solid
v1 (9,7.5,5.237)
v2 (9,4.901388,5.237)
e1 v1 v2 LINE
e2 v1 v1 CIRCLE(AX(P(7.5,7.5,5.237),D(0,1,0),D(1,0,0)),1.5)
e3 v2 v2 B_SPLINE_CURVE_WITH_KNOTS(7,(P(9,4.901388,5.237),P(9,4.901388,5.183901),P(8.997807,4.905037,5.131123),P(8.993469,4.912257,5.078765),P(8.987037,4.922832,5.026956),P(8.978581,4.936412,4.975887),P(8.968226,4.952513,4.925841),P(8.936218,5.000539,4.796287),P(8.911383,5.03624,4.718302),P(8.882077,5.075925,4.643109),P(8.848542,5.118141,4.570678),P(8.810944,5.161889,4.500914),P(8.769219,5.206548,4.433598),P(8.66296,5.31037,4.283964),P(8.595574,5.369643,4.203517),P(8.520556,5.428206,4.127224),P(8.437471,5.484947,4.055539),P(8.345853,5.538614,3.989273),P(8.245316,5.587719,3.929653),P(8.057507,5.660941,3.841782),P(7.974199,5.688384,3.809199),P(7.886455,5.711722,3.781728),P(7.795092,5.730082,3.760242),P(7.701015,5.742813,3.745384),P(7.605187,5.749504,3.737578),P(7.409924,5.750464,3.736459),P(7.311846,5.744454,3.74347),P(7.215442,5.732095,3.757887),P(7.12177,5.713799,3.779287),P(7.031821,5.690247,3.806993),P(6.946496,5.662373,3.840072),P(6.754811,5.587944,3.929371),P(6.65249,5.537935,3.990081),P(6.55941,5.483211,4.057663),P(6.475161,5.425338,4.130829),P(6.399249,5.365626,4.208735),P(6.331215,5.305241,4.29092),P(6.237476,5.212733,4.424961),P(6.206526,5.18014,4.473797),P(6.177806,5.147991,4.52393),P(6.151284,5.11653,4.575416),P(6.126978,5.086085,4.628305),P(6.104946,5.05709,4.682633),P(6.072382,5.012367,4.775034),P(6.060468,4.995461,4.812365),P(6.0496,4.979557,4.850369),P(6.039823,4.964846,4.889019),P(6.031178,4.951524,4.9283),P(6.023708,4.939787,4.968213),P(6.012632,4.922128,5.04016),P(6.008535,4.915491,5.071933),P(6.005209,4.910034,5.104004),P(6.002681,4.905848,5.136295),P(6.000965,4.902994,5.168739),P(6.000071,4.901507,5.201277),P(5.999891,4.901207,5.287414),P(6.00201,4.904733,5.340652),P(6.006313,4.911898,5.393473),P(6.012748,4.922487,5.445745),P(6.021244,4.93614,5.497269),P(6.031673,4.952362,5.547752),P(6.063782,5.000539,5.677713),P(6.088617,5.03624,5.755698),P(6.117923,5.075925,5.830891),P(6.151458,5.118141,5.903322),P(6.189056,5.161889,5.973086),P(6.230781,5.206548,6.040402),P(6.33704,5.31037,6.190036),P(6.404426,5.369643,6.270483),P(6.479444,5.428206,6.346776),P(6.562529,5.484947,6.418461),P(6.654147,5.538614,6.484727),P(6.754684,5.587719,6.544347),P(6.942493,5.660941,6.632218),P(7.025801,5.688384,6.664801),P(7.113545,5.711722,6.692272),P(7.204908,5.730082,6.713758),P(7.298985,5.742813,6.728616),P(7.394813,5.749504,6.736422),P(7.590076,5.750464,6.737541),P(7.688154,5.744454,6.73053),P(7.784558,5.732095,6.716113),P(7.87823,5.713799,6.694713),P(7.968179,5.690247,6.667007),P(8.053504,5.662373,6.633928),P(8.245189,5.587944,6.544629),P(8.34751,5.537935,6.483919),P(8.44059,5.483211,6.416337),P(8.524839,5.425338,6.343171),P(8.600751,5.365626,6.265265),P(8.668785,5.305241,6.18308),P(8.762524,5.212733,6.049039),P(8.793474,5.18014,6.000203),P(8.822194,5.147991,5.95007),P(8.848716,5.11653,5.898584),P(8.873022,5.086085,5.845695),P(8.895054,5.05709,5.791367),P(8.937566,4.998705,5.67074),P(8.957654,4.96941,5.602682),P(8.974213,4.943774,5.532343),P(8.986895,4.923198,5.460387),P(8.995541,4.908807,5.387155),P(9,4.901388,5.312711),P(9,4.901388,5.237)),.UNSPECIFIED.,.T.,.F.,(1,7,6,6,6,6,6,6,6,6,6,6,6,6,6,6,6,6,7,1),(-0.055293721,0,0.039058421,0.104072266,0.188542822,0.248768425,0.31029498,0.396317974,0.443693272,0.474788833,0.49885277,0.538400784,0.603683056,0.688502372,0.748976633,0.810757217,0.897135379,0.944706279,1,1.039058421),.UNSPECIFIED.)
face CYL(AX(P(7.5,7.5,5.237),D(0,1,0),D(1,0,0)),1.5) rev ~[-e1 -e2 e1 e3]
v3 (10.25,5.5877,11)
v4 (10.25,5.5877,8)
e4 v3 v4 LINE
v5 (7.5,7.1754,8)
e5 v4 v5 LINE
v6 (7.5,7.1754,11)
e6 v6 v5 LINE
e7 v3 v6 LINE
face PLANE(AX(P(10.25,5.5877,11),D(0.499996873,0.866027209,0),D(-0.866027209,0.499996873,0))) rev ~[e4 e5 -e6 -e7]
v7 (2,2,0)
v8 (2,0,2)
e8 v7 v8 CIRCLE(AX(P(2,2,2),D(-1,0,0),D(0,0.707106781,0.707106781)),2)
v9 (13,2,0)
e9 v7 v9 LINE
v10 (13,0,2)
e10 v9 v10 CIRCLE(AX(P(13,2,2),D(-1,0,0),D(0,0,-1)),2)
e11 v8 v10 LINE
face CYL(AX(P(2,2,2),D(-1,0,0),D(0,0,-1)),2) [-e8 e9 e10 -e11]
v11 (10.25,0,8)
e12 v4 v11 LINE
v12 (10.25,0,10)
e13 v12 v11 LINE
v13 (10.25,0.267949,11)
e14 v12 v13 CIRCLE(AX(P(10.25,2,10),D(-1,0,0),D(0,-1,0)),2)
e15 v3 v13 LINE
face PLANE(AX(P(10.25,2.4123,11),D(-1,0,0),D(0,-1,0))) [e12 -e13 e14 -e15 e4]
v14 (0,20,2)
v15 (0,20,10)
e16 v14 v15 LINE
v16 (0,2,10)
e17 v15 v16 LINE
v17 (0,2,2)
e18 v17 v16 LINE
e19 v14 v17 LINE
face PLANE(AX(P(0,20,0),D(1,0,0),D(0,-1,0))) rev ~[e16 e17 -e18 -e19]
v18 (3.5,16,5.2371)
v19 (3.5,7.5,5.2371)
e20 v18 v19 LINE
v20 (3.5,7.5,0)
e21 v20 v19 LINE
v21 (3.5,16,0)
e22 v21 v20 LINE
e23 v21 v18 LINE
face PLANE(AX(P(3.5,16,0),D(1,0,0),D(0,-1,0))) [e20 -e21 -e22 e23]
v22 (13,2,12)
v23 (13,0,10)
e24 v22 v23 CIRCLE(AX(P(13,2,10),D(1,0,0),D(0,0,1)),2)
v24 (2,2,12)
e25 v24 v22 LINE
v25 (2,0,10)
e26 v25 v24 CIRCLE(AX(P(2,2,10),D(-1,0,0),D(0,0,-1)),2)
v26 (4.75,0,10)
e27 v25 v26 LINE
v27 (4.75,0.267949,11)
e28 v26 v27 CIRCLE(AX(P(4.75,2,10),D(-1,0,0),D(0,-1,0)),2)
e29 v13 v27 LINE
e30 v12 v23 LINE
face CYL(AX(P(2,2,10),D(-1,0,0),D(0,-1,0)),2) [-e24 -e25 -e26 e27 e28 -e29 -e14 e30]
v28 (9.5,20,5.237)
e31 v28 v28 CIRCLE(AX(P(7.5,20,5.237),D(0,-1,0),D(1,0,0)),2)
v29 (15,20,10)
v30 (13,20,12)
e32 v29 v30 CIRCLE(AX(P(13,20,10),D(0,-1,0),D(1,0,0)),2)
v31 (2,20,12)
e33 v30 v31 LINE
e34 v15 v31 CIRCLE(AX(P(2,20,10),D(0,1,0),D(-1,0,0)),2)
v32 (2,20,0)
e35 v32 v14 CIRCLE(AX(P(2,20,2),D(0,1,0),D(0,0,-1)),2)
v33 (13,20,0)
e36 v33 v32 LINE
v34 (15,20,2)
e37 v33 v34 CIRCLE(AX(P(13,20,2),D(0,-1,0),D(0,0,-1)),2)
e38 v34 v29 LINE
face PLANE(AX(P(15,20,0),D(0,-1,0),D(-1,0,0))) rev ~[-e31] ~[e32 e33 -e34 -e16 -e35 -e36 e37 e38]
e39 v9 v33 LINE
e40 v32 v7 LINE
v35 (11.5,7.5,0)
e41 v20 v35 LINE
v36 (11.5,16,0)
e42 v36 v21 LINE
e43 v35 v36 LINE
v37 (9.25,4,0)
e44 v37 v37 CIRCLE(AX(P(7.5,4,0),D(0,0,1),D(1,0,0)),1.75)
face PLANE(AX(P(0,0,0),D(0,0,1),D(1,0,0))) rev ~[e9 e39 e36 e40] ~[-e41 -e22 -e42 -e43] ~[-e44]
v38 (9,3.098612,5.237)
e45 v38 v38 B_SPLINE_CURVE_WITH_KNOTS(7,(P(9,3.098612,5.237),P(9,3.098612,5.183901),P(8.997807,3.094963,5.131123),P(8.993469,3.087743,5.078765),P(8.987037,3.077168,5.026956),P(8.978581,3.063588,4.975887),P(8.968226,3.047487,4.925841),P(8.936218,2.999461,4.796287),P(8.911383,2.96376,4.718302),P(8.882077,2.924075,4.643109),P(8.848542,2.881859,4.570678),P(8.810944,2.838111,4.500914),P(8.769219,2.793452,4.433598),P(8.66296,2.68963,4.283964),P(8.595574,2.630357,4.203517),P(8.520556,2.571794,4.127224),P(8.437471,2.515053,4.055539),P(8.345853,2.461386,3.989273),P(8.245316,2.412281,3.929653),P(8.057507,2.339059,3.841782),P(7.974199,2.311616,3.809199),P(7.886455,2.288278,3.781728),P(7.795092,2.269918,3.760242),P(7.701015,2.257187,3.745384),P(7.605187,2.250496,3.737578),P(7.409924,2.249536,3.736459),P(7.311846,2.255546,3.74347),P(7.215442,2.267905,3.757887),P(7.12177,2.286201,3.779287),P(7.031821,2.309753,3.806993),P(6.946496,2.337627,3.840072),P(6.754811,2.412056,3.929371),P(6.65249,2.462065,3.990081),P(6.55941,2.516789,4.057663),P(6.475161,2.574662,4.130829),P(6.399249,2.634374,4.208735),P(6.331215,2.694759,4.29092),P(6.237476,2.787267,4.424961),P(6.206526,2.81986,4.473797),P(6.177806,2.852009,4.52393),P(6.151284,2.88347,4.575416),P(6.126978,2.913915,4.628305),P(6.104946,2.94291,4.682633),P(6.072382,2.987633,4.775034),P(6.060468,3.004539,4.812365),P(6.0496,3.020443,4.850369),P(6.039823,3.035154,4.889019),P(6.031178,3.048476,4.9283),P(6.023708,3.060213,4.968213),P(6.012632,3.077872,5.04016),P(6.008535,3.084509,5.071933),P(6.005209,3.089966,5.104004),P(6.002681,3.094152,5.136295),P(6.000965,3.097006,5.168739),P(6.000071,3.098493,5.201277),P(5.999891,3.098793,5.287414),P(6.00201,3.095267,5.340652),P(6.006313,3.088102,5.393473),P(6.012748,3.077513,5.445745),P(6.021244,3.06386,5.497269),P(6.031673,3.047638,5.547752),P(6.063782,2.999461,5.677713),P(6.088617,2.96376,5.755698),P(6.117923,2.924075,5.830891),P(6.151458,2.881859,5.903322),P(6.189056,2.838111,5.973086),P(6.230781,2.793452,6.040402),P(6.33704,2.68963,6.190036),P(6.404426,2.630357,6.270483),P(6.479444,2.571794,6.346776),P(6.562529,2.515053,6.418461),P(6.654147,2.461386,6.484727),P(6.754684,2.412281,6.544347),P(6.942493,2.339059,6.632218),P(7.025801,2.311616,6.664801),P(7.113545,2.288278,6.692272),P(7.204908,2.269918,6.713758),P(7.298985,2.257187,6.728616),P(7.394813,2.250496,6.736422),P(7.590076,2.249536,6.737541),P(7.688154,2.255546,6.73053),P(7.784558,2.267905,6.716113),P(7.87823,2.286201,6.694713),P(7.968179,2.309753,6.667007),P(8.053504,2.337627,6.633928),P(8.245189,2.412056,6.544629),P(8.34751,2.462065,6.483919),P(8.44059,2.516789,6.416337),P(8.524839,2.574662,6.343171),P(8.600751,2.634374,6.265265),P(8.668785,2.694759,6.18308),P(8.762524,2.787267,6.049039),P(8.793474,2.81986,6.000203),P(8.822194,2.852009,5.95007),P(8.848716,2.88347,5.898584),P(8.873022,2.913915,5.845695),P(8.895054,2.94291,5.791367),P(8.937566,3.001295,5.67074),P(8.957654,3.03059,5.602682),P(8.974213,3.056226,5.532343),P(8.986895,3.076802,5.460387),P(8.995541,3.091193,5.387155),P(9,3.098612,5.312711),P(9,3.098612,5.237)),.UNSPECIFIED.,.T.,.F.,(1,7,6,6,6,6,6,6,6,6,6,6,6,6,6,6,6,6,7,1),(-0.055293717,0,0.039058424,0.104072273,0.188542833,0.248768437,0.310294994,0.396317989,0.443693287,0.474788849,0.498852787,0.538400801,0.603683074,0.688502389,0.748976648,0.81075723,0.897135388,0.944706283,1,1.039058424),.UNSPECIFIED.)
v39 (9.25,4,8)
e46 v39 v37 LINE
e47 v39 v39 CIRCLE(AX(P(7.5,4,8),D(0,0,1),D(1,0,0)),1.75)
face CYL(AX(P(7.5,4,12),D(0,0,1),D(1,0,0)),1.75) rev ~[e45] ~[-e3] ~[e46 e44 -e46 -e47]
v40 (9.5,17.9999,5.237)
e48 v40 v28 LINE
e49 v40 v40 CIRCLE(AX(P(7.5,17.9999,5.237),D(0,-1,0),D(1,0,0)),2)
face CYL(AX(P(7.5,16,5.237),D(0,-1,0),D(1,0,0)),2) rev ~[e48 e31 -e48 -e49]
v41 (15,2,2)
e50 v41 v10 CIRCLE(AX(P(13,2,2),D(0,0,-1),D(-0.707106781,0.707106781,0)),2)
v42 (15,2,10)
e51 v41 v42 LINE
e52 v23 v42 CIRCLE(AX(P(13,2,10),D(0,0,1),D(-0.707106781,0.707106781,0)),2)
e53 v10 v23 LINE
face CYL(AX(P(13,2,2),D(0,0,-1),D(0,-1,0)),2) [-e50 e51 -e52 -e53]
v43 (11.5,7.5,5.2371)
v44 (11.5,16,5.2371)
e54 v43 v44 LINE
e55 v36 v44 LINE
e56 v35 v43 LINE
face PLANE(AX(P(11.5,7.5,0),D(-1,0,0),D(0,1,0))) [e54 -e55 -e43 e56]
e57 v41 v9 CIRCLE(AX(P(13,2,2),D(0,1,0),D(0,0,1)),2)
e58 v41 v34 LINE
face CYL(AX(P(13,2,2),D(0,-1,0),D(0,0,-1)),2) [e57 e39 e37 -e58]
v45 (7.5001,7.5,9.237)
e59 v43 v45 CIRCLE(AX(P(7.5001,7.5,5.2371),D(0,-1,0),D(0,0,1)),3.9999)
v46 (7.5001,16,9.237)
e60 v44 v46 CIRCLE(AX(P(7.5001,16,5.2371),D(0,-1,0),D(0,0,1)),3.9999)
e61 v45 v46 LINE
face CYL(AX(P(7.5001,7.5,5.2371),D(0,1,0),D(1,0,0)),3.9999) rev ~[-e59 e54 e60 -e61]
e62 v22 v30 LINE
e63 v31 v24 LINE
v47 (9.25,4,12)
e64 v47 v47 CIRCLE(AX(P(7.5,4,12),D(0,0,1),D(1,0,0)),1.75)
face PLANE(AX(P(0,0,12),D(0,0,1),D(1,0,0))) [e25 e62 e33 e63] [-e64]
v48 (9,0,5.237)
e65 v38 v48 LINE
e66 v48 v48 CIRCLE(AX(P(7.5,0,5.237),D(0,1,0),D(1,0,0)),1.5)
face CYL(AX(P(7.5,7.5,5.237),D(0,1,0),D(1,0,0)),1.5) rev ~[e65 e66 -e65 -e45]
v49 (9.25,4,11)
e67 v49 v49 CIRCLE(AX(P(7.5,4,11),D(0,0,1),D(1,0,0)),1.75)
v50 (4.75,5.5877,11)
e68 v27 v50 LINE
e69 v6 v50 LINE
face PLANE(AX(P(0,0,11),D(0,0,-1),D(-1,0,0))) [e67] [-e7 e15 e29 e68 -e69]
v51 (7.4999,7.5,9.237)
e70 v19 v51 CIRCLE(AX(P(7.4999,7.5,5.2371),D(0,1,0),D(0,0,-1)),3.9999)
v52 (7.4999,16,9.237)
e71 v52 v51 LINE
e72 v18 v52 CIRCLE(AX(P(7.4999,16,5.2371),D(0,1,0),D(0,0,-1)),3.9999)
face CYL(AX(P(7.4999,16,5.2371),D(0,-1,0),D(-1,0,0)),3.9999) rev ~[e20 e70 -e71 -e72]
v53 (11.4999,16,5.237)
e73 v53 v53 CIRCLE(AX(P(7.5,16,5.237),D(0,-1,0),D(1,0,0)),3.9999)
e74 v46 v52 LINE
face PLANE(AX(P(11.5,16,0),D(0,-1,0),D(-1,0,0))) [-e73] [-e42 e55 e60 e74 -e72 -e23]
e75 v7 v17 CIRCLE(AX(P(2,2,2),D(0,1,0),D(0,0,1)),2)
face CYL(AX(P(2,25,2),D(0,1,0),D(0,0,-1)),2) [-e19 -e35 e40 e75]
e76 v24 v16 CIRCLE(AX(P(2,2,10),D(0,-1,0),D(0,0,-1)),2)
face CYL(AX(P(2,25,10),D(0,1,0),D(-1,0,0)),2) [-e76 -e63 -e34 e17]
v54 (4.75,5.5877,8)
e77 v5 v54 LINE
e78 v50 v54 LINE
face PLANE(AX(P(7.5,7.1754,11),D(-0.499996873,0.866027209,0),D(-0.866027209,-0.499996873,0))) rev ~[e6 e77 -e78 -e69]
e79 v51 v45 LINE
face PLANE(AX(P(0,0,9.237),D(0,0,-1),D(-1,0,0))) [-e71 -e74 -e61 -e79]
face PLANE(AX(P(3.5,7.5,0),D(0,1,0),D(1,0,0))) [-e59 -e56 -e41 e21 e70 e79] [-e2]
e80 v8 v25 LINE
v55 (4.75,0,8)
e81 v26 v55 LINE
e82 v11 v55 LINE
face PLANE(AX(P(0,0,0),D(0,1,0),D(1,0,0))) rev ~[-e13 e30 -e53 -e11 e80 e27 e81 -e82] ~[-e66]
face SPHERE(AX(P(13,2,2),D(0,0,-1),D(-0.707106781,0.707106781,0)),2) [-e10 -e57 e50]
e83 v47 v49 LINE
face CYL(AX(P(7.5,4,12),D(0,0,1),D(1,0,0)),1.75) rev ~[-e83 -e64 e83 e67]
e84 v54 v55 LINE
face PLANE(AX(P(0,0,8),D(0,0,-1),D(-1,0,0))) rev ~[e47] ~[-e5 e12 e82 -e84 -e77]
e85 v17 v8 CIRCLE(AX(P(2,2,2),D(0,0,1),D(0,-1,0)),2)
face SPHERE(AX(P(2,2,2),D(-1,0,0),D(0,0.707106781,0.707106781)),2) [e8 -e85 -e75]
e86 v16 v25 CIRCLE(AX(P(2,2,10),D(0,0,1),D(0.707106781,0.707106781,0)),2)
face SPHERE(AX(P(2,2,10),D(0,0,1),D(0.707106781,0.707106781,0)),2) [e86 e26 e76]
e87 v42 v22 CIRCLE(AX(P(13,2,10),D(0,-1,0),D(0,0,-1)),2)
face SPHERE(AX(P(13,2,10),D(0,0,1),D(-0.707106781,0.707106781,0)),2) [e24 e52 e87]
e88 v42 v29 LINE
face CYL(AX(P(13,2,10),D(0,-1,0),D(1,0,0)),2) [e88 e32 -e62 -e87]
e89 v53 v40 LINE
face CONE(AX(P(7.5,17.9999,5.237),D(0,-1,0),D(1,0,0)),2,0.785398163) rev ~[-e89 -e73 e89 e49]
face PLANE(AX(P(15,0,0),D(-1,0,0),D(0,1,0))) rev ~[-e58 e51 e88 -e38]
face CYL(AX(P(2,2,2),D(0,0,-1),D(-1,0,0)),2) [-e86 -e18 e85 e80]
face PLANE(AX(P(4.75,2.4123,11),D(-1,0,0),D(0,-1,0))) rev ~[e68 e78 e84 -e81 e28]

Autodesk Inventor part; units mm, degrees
ref_plane "YZ Plane" through (0, 0, 0) normal (1, 0, 0) x (0, 1, 0)
ref_plane "XZ Plane" through (0, 0, 0) normal (0, 1, 0) x (-1, 0, 0)
sketch "Sketch1" plane through (0, 0, 0) normal (0, 0, 1) x (1, 0, 0)
  line L0 (0, 0) -> (15, 0)
  line L1 (15, 0) -> (15, 20)
  line L2 (15, 20) -> (0, 20)
  line L3 (0, 20) -> (0, 0)
  dimension "d0" = 15
  dimension "d1" = 20
extrude "Extrusion1" add sketch "Sketch1" along normal blind 12
sketch "Sketch2" plane through (0, 0, 12) normal (0, 0, 1) x (1, 0, 0)
  line L0 (0, 0) -> (15, 0) projected
  line L1 (15, 0) -> (15, 20) projected
  circle A0 centre (7.5, 4) radius 1.75
  dimension "d4" = 3.5
  dimension "d5" = 7.5
  dimension "d6" = 4
extrude "Extrusion2" cut sketch "Sketch2" against normal up to next
sketch "Sketch5" plane through (0, 0, 0) normal (0, 0, -1) x (-1, 0, 0)
  line L0 (0, 20) -> (0, 0) projected
  line L1 (-15, 20) -> (0, 20) projected
  line L2 (-11.5, 16) -> (-3.5, 16)
  line L3 (-3.5, 16) -> (-3.5, 7.5)
  line L4 (-3.5, 7.5) -> (-11.5, 7.5)
  line L5 (-11.5, 7.5) -> (-11.5, 16)
  dimension "d15" = 8
  dimension "d16" = 8.5
  dimension "d17" = 4
  dimension "d18" = 3.5
extrude "Extrusion4" cut sketch "Sketch5" against normal blind 9.237
fillet "Fillet1" radius 4 2 edges at (11.5, 11.75, 9.237) (3.5, 11.75, 9.237)
sketch "Sketch6" plane through (3.5, 16, 0) normal (0, -1, 0) x (1, 0, 0)
  arc A0 (8, 5.237) -> (0, 5.237) centre (4, 5.237) ccw projected
  circle A1 centre (4, 5.237) radius 2
  point P0 (-3.5, 0)
  dimension "d22" = 4
extrude "Extrusion5" cut sketch "Sketch6" against normal up to surface (4 mm away)
chamfer "Chamfer1" distance 2 angle 45 1 edges at (5.5, 16, 5.237)
sketch "Sketch7" plane through (3.5, 7.5, 0) normal (0, 1, 0) x (1, 0, 0)
  arc A0 (0, -5.237) -> (8, -5.237) centre (4, -5.237) ccw projected
  circle A1 centre (4, -5.237) radius 1.5
  point P0 (-3.5, 0)
  dimension "d28" = 3
extrude "Extrusion6" cut sketch "Sketch7" against normal up to surface (7.5 mm away)
ref_plane "Work Plane1" through (0, 0, 11) normal (0, 0, -1) x (-1, 0, 0)
sketch "Sketch8" plane through (0, 0, 11) normal (0, 0, -1) x (-1, 0, 0)
  circle A0 centre (-7.5, 4) radius 1.75 projected
  line L0 (-7.5, 7.1754) -> (-4.75, 5.5877)
  line L1 (-4.75, 5.5877) -> (-4.75, 2.4123)
  line L2 (-10.25, 2.4123) -> (-10.25, 5.5877)
  line L3 (-10.25, 5.5877) -> (-7.5, 7.1754)
  line L4 (-10.25, 2.4123) -> (-10.25, 0)
  line L5 (-4.75, 2.4123) -> (-4.75, 0)
  line L6 (-10.25, 0) -> (-4.75, 0)
  line L7 (0, 0) -> (-15, 0) projected
  dimension "d32" = 5.5
extrude "Extrusion7" cut sketch "Sketch8" along normal blind 3
fillet "Fillet2" radius 2 8 edges at (15, 0, 6) (0, 0, 6) (15, 10, 0) (15, 10, 12) (0, 10, 0) (7.5, 0, 0) (7.5, 0, 12) (0, 10, 12)
properties part number "PanelMount" material "ABS Plastic"
